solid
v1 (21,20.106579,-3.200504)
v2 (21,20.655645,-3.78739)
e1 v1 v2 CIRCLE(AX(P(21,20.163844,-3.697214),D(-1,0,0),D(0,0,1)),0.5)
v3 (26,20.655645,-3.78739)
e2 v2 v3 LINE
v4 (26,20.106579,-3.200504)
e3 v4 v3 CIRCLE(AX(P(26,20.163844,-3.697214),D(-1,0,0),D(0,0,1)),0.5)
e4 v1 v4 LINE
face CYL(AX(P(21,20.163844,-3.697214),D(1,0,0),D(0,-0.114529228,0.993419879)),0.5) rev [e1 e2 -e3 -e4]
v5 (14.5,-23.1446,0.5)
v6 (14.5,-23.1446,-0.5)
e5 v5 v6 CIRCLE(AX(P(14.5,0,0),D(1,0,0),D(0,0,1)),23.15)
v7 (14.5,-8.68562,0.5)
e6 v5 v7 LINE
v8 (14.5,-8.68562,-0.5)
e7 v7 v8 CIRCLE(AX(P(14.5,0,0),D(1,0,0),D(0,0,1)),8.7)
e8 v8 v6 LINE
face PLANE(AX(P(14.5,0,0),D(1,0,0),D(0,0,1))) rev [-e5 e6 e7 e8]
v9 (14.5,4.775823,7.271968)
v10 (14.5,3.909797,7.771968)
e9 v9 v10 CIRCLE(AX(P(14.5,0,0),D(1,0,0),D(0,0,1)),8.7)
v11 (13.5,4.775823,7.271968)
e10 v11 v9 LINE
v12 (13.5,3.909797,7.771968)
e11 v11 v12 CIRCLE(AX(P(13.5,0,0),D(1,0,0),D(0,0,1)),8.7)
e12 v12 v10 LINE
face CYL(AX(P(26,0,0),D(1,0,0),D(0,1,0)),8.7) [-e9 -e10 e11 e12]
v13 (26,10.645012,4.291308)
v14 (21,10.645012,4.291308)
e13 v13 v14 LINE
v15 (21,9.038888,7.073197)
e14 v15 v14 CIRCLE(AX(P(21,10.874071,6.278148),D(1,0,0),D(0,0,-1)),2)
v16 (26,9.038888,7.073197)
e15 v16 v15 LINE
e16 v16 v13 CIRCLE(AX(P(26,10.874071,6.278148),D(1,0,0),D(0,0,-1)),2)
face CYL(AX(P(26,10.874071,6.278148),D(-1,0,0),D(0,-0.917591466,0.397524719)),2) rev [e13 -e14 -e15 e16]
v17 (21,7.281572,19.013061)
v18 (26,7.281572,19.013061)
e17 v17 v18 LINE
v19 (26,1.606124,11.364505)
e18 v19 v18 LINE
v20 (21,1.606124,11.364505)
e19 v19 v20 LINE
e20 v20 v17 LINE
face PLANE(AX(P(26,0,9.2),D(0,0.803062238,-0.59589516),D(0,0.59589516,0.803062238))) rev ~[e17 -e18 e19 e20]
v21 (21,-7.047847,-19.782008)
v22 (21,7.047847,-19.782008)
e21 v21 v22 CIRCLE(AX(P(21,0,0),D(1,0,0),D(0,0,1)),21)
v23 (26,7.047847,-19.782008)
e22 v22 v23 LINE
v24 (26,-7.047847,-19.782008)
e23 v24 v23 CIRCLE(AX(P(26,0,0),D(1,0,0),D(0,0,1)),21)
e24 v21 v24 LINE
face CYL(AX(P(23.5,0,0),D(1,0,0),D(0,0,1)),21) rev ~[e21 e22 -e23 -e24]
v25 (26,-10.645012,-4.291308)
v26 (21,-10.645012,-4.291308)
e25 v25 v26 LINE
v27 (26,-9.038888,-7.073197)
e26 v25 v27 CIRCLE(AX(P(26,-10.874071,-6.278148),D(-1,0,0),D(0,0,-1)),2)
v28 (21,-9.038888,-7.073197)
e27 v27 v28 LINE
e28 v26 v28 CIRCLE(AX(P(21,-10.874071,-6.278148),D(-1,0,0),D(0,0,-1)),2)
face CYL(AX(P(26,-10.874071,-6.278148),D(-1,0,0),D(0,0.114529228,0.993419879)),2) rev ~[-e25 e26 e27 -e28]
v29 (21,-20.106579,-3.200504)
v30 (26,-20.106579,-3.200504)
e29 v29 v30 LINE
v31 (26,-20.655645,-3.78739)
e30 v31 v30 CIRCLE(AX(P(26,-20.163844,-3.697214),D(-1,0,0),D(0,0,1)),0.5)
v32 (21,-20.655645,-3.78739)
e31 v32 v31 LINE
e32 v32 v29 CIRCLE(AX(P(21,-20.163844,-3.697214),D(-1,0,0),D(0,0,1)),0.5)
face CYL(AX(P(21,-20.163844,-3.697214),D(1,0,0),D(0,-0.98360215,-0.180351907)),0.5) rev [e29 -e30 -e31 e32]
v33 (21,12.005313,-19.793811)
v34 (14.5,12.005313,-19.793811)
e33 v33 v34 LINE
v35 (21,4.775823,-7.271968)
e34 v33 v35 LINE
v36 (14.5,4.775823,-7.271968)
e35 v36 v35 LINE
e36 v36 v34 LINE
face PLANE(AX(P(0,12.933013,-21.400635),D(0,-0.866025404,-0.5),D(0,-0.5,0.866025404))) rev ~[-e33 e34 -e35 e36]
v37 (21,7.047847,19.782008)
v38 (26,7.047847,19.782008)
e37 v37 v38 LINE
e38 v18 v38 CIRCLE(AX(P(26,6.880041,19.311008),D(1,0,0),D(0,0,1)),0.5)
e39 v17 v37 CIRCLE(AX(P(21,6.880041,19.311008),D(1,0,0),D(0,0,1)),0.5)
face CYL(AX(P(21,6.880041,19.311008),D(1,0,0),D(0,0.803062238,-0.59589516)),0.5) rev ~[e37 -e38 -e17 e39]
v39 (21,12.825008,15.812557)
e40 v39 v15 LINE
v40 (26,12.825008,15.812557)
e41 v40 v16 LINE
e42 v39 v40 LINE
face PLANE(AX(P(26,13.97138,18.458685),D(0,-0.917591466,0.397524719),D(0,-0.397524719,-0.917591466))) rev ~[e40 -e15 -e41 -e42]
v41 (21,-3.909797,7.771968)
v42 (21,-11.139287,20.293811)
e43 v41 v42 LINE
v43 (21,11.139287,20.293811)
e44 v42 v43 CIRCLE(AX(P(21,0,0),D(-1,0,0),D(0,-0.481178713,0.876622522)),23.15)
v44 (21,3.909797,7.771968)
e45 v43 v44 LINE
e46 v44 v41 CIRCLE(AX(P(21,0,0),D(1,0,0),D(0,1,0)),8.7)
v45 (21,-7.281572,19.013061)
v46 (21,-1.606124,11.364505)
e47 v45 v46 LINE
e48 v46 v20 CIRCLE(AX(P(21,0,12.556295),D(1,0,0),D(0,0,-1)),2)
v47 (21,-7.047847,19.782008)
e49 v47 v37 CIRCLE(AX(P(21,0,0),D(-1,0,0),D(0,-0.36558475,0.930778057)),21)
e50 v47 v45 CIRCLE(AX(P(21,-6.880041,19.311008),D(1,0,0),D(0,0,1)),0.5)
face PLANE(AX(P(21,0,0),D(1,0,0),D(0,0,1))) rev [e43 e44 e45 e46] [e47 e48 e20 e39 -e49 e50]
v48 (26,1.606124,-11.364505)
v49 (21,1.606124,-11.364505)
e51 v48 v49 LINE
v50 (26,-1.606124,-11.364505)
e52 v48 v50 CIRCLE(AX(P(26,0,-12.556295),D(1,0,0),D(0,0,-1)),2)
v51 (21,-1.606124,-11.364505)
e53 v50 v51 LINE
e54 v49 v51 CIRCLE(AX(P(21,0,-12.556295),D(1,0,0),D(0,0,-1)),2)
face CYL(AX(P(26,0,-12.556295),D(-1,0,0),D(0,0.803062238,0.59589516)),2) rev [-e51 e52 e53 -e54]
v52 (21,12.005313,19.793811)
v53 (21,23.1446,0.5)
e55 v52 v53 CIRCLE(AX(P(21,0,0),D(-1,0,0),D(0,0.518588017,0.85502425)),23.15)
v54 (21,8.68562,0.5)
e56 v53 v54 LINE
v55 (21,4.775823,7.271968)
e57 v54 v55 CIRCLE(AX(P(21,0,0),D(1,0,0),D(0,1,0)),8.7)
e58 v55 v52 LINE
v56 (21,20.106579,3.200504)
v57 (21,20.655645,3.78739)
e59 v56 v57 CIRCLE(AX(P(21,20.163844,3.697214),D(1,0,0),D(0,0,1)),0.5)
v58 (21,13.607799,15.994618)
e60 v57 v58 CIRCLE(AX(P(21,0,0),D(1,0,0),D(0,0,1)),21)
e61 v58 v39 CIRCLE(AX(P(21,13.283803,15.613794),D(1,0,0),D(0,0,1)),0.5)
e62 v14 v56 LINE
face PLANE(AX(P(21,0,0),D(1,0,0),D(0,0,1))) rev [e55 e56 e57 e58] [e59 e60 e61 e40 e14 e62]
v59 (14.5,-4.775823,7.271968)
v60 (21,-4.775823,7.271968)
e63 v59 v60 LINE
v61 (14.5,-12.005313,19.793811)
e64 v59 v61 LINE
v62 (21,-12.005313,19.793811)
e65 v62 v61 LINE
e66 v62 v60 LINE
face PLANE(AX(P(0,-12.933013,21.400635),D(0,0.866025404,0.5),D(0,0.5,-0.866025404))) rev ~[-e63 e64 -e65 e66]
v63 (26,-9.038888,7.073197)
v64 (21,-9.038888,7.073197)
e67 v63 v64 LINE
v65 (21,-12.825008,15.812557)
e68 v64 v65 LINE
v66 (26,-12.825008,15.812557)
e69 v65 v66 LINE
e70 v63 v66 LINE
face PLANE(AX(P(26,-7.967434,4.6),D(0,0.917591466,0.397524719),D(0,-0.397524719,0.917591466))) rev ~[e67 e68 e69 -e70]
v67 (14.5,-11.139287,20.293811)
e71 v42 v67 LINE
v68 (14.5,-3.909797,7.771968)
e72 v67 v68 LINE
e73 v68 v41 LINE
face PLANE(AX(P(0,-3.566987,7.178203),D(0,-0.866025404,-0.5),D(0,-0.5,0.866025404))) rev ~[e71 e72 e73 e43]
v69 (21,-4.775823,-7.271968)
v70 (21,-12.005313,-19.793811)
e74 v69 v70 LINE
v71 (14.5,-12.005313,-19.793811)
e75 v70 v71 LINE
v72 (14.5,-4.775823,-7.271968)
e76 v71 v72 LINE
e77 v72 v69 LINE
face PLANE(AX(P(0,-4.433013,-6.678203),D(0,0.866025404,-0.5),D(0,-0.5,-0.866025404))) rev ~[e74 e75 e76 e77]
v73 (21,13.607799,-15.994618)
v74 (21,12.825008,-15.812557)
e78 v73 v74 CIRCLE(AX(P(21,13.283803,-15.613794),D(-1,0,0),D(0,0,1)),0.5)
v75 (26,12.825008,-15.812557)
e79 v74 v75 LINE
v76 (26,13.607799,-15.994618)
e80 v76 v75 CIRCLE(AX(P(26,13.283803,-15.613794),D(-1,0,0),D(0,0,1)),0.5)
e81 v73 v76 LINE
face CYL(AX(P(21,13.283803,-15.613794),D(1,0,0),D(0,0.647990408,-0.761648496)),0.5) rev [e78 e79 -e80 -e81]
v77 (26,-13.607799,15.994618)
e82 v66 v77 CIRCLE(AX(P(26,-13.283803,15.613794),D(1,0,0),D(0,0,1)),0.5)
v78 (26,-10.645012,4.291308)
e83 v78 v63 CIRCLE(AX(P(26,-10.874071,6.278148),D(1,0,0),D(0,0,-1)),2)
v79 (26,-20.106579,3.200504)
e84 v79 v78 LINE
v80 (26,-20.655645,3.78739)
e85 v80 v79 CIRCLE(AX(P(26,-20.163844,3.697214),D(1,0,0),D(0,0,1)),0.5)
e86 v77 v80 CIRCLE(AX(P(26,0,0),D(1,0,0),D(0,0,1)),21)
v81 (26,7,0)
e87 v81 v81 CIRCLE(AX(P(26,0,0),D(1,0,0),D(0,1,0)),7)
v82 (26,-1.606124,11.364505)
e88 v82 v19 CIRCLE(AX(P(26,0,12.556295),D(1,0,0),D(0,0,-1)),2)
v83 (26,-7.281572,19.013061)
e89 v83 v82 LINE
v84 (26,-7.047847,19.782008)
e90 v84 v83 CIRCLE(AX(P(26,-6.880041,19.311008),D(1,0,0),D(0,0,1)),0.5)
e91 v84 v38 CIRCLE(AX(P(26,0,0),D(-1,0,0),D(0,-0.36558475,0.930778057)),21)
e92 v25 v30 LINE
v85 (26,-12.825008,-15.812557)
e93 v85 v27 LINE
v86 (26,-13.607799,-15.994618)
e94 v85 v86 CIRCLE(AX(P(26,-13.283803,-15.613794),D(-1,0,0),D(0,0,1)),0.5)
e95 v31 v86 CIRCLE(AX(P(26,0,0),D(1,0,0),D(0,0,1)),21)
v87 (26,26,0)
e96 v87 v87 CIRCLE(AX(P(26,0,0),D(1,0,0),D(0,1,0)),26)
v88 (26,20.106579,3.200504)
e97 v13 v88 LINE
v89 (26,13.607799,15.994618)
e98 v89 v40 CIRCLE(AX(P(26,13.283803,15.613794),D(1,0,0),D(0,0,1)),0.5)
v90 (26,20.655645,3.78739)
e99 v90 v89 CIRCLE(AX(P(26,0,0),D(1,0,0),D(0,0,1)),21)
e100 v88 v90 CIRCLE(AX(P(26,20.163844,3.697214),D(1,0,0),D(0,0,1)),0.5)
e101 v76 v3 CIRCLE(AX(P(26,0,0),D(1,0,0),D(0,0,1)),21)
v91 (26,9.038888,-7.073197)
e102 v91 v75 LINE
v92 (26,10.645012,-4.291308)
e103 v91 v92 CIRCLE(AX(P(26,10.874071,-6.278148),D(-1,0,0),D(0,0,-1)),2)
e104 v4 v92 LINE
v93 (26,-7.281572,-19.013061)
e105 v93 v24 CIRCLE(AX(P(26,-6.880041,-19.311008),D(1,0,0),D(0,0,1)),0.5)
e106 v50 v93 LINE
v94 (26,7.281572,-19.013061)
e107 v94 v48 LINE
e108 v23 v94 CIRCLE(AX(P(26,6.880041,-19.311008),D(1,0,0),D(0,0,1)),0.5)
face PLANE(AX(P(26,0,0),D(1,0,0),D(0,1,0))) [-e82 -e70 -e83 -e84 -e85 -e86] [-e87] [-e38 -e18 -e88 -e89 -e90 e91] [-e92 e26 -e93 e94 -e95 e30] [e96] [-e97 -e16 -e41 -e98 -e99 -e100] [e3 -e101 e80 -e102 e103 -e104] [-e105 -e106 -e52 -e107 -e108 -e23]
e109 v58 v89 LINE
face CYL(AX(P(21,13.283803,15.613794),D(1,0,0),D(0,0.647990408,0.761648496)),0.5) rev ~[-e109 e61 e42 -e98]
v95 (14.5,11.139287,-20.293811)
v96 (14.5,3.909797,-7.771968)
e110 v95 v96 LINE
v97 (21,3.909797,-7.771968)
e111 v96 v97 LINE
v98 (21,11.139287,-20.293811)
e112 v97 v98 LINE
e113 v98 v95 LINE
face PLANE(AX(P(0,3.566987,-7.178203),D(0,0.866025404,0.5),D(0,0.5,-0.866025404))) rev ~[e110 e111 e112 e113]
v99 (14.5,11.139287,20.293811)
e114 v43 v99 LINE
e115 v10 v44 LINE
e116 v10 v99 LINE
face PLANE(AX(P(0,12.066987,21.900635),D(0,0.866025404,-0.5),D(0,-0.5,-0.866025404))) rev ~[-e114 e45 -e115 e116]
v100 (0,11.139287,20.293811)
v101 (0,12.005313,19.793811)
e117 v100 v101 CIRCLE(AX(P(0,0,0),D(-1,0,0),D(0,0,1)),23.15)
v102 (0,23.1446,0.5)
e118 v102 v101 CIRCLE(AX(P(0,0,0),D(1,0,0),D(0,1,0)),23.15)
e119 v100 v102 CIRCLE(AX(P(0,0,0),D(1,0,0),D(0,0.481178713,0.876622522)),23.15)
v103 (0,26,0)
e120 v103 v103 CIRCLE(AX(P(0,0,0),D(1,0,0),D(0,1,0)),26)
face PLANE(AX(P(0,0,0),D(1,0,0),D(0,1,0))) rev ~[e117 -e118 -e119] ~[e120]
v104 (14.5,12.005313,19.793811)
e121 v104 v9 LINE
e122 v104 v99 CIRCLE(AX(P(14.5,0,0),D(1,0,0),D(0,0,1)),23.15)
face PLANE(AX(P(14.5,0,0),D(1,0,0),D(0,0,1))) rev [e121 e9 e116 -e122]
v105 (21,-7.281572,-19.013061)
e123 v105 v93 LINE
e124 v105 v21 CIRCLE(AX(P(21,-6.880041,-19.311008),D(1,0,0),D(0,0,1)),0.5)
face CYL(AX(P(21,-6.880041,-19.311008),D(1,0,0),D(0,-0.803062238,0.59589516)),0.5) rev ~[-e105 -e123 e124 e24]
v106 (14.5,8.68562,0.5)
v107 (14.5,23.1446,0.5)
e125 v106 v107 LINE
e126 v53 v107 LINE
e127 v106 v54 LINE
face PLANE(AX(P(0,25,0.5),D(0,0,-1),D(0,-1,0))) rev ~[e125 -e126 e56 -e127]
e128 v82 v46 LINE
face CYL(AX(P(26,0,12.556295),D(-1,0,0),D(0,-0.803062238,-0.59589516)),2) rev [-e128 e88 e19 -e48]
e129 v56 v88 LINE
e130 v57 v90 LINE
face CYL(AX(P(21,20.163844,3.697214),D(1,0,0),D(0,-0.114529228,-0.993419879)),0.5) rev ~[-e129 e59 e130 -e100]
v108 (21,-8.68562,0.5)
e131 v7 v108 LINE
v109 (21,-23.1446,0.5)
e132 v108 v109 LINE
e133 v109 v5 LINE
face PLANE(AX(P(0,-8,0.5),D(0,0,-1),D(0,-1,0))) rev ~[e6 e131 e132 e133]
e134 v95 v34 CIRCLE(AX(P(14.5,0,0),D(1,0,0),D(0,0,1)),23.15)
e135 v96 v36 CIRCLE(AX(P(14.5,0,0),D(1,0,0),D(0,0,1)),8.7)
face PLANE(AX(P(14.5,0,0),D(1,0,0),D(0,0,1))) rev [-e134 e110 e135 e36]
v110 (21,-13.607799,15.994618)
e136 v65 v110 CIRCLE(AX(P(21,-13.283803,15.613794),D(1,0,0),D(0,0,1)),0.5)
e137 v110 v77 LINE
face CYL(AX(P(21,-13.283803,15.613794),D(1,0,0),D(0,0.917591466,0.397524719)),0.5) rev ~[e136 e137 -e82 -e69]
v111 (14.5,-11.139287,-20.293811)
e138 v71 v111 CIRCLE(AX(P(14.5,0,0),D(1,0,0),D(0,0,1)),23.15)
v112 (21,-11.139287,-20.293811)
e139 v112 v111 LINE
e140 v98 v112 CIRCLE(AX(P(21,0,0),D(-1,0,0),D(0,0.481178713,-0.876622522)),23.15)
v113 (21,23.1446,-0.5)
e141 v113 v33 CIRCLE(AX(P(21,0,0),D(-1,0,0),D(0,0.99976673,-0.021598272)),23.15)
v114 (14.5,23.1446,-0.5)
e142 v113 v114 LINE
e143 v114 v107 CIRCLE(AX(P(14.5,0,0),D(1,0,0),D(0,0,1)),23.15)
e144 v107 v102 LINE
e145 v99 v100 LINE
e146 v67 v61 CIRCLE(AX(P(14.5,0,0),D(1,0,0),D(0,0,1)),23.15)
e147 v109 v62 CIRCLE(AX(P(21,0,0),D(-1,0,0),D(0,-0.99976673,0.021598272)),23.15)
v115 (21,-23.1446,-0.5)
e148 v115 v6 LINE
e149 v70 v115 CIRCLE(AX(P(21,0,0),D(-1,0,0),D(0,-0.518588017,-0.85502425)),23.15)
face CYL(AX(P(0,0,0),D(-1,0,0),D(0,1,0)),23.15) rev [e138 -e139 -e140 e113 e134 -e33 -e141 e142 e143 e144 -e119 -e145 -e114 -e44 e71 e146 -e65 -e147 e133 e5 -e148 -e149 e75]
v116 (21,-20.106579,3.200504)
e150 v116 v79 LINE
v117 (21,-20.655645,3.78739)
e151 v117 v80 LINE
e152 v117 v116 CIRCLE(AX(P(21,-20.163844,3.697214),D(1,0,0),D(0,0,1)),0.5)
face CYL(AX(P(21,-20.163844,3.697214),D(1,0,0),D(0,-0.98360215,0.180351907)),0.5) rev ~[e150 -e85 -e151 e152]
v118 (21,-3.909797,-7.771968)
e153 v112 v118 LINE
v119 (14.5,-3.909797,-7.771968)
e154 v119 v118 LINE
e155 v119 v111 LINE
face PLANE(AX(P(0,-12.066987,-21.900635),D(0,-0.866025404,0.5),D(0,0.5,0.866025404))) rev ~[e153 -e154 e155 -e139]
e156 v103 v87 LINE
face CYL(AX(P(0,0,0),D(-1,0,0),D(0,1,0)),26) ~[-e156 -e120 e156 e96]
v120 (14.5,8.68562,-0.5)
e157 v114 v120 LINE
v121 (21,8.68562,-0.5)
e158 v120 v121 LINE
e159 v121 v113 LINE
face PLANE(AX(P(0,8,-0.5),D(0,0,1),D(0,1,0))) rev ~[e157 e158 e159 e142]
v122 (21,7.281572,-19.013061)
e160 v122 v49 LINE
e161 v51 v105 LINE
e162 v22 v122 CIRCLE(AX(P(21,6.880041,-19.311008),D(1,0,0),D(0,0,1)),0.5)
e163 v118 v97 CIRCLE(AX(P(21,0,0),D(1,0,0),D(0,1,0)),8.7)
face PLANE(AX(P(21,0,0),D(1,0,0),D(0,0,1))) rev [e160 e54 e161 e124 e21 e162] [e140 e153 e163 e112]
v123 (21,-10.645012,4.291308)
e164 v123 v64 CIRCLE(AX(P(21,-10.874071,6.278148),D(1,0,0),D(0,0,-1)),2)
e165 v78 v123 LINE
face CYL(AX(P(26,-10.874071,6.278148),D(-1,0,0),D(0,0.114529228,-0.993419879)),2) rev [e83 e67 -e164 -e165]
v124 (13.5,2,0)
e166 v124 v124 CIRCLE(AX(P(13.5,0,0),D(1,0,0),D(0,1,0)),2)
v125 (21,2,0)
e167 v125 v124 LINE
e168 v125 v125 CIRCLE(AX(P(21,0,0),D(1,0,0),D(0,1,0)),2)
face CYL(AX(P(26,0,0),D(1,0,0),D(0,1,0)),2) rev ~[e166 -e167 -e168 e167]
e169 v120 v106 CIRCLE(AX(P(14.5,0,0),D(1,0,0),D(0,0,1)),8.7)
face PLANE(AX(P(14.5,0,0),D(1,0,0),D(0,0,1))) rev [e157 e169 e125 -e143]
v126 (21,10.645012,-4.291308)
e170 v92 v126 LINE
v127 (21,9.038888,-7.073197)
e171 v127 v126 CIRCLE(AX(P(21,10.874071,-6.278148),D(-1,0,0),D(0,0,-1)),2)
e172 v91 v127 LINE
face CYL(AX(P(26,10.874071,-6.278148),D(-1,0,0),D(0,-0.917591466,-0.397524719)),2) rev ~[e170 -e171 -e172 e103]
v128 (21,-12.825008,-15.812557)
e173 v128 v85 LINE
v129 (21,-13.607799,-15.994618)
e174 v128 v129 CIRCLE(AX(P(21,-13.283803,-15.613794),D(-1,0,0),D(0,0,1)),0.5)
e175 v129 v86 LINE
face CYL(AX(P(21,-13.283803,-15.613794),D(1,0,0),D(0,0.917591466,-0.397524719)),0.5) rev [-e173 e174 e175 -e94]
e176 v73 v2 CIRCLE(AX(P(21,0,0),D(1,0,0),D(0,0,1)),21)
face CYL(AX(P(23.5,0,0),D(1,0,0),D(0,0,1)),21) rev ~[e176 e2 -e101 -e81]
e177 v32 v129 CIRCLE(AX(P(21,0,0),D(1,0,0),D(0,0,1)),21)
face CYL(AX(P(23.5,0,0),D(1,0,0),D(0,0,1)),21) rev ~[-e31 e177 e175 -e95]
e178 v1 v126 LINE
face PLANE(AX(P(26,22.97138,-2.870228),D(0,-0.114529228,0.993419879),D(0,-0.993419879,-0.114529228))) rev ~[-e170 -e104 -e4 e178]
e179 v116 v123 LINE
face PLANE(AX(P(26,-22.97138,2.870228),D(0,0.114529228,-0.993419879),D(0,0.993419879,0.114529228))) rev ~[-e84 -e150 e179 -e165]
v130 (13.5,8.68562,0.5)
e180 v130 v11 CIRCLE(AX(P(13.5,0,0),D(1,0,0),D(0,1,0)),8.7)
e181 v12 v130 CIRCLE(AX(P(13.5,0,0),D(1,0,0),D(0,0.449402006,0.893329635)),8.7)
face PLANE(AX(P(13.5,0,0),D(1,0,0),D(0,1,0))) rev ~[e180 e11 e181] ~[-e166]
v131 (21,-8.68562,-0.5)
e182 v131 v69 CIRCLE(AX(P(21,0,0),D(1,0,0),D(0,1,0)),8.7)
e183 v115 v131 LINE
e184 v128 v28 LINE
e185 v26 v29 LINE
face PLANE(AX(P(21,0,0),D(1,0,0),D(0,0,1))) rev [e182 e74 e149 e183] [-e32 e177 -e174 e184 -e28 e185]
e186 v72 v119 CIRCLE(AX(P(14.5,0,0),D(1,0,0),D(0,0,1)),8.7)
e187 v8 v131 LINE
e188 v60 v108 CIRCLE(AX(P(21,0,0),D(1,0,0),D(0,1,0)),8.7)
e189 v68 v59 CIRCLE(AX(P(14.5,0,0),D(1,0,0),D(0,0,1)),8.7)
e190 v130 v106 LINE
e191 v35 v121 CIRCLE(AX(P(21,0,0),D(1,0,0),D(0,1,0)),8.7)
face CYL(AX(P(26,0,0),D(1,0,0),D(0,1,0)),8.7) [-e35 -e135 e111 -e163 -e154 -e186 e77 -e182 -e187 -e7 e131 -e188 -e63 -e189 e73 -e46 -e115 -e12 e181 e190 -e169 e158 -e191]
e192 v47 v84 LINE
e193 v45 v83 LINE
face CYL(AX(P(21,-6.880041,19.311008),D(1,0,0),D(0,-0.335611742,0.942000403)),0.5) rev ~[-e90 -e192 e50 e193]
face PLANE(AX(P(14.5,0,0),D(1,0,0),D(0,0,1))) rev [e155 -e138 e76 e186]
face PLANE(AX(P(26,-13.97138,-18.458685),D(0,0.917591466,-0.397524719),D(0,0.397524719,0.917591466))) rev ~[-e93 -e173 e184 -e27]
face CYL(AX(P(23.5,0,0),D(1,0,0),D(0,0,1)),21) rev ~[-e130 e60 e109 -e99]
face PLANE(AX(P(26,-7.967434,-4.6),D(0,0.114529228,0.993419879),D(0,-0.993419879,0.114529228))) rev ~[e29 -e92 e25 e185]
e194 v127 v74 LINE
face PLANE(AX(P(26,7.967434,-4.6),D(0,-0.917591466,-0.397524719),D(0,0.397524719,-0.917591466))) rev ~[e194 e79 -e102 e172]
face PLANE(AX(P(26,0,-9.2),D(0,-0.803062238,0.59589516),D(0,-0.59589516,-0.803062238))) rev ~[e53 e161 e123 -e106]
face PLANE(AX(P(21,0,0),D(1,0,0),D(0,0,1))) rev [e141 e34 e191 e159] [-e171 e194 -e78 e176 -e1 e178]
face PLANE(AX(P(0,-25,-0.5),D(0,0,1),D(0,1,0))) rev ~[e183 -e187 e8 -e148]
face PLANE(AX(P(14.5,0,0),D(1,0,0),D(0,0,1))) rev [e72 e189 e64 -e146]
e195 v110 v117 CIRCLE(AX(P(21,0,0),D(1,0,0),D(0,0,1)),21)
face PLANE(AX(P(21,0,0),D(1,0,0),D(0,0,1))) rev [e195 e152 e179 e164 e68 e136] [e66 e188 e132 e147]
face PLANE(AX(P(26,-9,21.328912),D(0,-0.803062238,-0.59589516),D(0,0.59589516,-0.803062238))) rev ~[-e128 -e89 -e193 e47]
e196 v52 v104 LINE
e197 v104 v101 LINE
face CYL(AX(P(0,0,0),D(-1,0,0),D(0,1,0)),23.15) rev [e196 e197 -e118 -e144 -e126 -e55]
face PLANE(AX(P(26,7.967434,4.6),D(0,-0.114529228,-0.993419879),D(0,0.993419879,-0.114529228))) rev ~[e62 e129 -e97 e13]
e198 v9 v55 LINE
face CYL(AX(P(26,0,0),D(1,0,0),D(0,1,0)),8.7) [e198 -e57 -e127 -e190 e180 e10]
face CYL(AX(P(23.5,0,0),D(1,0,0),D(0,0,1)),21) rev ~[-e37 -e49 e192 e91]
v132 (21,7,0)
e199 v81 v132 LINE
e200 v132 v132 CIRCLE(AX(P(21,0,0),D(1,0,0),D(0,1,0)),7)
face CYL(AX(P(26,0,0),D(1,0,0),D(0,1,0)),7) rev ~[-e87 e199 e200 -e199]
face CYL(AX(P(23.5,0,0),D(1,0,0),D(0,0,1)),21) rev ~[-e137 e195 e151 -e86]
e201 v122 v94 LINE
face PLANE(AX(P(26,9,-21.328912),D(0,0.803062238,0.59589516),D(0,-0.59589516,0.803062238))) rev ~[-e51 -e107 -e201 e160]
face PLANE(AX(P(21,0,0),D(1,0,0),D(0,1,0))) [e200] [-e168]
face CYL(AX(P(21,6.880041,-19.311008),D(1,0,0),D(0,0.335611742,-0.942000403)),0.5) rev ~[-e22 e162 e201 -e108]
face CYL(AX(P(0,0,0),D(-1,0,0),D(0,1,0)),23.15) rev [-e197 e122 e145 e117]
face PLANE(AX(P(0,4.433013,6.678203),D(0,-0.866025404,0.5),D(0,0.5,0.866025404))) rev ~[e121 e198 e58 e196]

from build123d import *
from build123d import SkipClean  # not in build123d's __all__

# Parameters (mm, degrees)
F0_R      = 26
F1_DEPTH  = 26
F3_R      = 23.15
F4_DEPTH  = 21
F5_R      = 8.7
F6_DEPTH  = 12.5
F8_DEPTH  = 25
F9_R      = 7
F10_DEPTH = 5
F11_R     = 2
F12_DEPTH = 25
F13_W     = 5
F13_H     = 4.1104049385
F16_DEPTH = 25
F19_R     = 2
F20_R     = 0.5


with BuildPart() as f1:
    # F0 (on Right) → F1 (new body)
    with BuildSketch(Plane.YZ):
        Circle(F0_R)
    extrude(amount=F1_DEPTH)

    # F3 (on Right) → F4 (cut)
    with BuildSketch(Plane.YZ):
        Circle(F3_R)
    extrude(amount=F4_DEPTH, mode=Mode.SUBTRACT)

    # F5 (on offset) → F6 (join)
    with BuildSketch(Plane.YZ.offset(26)):
        Circle(F5_R)
    extrude(amount=-F6_DEPTH)

    # F7 (on offset) → F8 (cut)
    with BuildSketch(Plane.YZ.offset(26)):
        Polygon((-22.9713798889, 2.8702275171), (-7.9674337148, 4.6), (-13.9713798889, 18.4586847852), align=None)
        Polygon((-9, 21.3289123023), (0, 9.2), (9, 21.3289123023), align=None)
        Polygon((13.9713798889, 18.4586847852), (7.9674337148, 4.6), (22.9713798889, 2.8702275171), align=None)
        Polygon((22.9713798889, -2.8702275171), (7.9674337148, -4.6), (13.9713798889, -18.4586847852), align=None)
        Polygon((9, -21.3289123023), (0, -9.2), (-9, -21.3289123023), align=None)
        Polygon((-13.9713798889, -18.4586847852), (-7.9674337148, -4.6), (-22.9713798889, -2.8702275171), align=None)
    extrude(amount=-F8_DEPTH, mode=Mode.SUBTRACT)

    # F9 (on offset) → F10 (cut)
    with BuildSketch(Plane.YZ.offset(26)):
        Circle(F9_R)
    extrude(amount=-F10_DEPTH, mode=Mode.SUBTRACT)

    # F11 (on offset) → F12 (cut)
    with BuildSketch(Plane.YZ.offset(26)):
        Circle(F11_R)
    extrude(amount=-F12_DEPTH, mode=Mode.SUBTRACT)

    # F13 (on Front) → F14 (revolve)
    with BuildSketch(Plane.XZ):
        with Locations((23.5, 23.0552024692)):
            Rectangle(F13_W, F13_H)
    revolve(axis=Axis((13.1547623314, 0, 0), (1, 0, 0)))

    # F15 (on Right) → F16 (join)
    with BuildSketch(Plane.YZ):
        Polygon((12.9330127019, 21.4006350946), (12.5, 21.6506350946), (12.0669872981, 21.9006350946), (3.5669872981, 7.1782032303), (4.4330127019, 6.6782032303), align=None)
        Polygon((-3.5669872981, 7.1782032303), (-12.0669872981, 21.9006350946), (-12.5, 21.6506350946), (-12.9330127019, 21.4006350946), (-4.4330127019, 6.6782032303), align=None)
        Polygon((-8, 0.5), (-25, 0.5), (-25, 0), (-25, -0.5), (-8, -0.5), align=None)
        Polygon((-4.4330127019, -6.6782032303), (-12.9330127019, -21.4006350946), (-12.5, -21.6506350946), (-12.0669872981, -21.9006350946), (-3.5669872981, -7.1782032303), align=None)
        Polygon((3.5669872981, -7.1782032303), (12.0669872981, -21.9006350946), (12.5, -21.6506350946), (12.9330127019, -21.4006350946), (4.4330127019, -6.6782032303), align=None)
        Polygon((8, -0.5), (25, -0.5), (25, 0), (25, 0.5), (8, 0.5), align=None)
    extrude(amount=F16_DEPTH)

    # F17 (on Front) → F18 (revolve, cut)
    with BuildSketch(Plane.XZ):
        Polygon((14.5, 23.15), (-3.0704529053, 23.15), (-1.8057800443, 5.6787895144), (13.5, 5.6787895144), (13.5, 8.7), (14.5, 8.7), align=None)
    with SkipClean():  # cleaning this boolean's faces spoils the solid; the shape is the same uncleaned
        revolve(axis=Axis((9.9325310439, 0, 0), (1, 0, 0)), mode=Mode.SUBTRACT)

    # F19
    f19_edges = [f1.edges().sort_by_distance(p)[0] for p in [
        (23.5, -7.967434, 4.6),
        (23.5, 0, 9.2),
        (23.5, 7.967434, 4.6),
        (23.5, 7.967434, -4.6),
        (23.5, 0, -9.2),
        (23.5, -7.967434, -4.6),
    ]]
    fillet(f19_edges, radius=F19_R)

    # F20
    f20_edges = [f1.edges().sort_by_distance(p)[0] for p in [
        (23.5, 20.766266, -3.12445),
        (23.5, 13.088986, -16.421889),
        (23.5, 20.766266, 3.12445),
        (23.5, 13.088986, 16.421889),
        (23.5, 7.67728, -19.546339),
        (23.5, 7.67728, 19.546339),
        (23.5, -7.67728, 19.546339),
        (23.5, -13.088986, 16.421889),
        (23.5, -20.766266, 3.12445),
        (23.5, -20.766266, -3.12445),
        (23.5, -13.088986, -16.421889),
        (23.5, -7.67728, -19.546339),
    ]]
    fillet(f20_edges, radius=F20_R)


solid = f1.part
